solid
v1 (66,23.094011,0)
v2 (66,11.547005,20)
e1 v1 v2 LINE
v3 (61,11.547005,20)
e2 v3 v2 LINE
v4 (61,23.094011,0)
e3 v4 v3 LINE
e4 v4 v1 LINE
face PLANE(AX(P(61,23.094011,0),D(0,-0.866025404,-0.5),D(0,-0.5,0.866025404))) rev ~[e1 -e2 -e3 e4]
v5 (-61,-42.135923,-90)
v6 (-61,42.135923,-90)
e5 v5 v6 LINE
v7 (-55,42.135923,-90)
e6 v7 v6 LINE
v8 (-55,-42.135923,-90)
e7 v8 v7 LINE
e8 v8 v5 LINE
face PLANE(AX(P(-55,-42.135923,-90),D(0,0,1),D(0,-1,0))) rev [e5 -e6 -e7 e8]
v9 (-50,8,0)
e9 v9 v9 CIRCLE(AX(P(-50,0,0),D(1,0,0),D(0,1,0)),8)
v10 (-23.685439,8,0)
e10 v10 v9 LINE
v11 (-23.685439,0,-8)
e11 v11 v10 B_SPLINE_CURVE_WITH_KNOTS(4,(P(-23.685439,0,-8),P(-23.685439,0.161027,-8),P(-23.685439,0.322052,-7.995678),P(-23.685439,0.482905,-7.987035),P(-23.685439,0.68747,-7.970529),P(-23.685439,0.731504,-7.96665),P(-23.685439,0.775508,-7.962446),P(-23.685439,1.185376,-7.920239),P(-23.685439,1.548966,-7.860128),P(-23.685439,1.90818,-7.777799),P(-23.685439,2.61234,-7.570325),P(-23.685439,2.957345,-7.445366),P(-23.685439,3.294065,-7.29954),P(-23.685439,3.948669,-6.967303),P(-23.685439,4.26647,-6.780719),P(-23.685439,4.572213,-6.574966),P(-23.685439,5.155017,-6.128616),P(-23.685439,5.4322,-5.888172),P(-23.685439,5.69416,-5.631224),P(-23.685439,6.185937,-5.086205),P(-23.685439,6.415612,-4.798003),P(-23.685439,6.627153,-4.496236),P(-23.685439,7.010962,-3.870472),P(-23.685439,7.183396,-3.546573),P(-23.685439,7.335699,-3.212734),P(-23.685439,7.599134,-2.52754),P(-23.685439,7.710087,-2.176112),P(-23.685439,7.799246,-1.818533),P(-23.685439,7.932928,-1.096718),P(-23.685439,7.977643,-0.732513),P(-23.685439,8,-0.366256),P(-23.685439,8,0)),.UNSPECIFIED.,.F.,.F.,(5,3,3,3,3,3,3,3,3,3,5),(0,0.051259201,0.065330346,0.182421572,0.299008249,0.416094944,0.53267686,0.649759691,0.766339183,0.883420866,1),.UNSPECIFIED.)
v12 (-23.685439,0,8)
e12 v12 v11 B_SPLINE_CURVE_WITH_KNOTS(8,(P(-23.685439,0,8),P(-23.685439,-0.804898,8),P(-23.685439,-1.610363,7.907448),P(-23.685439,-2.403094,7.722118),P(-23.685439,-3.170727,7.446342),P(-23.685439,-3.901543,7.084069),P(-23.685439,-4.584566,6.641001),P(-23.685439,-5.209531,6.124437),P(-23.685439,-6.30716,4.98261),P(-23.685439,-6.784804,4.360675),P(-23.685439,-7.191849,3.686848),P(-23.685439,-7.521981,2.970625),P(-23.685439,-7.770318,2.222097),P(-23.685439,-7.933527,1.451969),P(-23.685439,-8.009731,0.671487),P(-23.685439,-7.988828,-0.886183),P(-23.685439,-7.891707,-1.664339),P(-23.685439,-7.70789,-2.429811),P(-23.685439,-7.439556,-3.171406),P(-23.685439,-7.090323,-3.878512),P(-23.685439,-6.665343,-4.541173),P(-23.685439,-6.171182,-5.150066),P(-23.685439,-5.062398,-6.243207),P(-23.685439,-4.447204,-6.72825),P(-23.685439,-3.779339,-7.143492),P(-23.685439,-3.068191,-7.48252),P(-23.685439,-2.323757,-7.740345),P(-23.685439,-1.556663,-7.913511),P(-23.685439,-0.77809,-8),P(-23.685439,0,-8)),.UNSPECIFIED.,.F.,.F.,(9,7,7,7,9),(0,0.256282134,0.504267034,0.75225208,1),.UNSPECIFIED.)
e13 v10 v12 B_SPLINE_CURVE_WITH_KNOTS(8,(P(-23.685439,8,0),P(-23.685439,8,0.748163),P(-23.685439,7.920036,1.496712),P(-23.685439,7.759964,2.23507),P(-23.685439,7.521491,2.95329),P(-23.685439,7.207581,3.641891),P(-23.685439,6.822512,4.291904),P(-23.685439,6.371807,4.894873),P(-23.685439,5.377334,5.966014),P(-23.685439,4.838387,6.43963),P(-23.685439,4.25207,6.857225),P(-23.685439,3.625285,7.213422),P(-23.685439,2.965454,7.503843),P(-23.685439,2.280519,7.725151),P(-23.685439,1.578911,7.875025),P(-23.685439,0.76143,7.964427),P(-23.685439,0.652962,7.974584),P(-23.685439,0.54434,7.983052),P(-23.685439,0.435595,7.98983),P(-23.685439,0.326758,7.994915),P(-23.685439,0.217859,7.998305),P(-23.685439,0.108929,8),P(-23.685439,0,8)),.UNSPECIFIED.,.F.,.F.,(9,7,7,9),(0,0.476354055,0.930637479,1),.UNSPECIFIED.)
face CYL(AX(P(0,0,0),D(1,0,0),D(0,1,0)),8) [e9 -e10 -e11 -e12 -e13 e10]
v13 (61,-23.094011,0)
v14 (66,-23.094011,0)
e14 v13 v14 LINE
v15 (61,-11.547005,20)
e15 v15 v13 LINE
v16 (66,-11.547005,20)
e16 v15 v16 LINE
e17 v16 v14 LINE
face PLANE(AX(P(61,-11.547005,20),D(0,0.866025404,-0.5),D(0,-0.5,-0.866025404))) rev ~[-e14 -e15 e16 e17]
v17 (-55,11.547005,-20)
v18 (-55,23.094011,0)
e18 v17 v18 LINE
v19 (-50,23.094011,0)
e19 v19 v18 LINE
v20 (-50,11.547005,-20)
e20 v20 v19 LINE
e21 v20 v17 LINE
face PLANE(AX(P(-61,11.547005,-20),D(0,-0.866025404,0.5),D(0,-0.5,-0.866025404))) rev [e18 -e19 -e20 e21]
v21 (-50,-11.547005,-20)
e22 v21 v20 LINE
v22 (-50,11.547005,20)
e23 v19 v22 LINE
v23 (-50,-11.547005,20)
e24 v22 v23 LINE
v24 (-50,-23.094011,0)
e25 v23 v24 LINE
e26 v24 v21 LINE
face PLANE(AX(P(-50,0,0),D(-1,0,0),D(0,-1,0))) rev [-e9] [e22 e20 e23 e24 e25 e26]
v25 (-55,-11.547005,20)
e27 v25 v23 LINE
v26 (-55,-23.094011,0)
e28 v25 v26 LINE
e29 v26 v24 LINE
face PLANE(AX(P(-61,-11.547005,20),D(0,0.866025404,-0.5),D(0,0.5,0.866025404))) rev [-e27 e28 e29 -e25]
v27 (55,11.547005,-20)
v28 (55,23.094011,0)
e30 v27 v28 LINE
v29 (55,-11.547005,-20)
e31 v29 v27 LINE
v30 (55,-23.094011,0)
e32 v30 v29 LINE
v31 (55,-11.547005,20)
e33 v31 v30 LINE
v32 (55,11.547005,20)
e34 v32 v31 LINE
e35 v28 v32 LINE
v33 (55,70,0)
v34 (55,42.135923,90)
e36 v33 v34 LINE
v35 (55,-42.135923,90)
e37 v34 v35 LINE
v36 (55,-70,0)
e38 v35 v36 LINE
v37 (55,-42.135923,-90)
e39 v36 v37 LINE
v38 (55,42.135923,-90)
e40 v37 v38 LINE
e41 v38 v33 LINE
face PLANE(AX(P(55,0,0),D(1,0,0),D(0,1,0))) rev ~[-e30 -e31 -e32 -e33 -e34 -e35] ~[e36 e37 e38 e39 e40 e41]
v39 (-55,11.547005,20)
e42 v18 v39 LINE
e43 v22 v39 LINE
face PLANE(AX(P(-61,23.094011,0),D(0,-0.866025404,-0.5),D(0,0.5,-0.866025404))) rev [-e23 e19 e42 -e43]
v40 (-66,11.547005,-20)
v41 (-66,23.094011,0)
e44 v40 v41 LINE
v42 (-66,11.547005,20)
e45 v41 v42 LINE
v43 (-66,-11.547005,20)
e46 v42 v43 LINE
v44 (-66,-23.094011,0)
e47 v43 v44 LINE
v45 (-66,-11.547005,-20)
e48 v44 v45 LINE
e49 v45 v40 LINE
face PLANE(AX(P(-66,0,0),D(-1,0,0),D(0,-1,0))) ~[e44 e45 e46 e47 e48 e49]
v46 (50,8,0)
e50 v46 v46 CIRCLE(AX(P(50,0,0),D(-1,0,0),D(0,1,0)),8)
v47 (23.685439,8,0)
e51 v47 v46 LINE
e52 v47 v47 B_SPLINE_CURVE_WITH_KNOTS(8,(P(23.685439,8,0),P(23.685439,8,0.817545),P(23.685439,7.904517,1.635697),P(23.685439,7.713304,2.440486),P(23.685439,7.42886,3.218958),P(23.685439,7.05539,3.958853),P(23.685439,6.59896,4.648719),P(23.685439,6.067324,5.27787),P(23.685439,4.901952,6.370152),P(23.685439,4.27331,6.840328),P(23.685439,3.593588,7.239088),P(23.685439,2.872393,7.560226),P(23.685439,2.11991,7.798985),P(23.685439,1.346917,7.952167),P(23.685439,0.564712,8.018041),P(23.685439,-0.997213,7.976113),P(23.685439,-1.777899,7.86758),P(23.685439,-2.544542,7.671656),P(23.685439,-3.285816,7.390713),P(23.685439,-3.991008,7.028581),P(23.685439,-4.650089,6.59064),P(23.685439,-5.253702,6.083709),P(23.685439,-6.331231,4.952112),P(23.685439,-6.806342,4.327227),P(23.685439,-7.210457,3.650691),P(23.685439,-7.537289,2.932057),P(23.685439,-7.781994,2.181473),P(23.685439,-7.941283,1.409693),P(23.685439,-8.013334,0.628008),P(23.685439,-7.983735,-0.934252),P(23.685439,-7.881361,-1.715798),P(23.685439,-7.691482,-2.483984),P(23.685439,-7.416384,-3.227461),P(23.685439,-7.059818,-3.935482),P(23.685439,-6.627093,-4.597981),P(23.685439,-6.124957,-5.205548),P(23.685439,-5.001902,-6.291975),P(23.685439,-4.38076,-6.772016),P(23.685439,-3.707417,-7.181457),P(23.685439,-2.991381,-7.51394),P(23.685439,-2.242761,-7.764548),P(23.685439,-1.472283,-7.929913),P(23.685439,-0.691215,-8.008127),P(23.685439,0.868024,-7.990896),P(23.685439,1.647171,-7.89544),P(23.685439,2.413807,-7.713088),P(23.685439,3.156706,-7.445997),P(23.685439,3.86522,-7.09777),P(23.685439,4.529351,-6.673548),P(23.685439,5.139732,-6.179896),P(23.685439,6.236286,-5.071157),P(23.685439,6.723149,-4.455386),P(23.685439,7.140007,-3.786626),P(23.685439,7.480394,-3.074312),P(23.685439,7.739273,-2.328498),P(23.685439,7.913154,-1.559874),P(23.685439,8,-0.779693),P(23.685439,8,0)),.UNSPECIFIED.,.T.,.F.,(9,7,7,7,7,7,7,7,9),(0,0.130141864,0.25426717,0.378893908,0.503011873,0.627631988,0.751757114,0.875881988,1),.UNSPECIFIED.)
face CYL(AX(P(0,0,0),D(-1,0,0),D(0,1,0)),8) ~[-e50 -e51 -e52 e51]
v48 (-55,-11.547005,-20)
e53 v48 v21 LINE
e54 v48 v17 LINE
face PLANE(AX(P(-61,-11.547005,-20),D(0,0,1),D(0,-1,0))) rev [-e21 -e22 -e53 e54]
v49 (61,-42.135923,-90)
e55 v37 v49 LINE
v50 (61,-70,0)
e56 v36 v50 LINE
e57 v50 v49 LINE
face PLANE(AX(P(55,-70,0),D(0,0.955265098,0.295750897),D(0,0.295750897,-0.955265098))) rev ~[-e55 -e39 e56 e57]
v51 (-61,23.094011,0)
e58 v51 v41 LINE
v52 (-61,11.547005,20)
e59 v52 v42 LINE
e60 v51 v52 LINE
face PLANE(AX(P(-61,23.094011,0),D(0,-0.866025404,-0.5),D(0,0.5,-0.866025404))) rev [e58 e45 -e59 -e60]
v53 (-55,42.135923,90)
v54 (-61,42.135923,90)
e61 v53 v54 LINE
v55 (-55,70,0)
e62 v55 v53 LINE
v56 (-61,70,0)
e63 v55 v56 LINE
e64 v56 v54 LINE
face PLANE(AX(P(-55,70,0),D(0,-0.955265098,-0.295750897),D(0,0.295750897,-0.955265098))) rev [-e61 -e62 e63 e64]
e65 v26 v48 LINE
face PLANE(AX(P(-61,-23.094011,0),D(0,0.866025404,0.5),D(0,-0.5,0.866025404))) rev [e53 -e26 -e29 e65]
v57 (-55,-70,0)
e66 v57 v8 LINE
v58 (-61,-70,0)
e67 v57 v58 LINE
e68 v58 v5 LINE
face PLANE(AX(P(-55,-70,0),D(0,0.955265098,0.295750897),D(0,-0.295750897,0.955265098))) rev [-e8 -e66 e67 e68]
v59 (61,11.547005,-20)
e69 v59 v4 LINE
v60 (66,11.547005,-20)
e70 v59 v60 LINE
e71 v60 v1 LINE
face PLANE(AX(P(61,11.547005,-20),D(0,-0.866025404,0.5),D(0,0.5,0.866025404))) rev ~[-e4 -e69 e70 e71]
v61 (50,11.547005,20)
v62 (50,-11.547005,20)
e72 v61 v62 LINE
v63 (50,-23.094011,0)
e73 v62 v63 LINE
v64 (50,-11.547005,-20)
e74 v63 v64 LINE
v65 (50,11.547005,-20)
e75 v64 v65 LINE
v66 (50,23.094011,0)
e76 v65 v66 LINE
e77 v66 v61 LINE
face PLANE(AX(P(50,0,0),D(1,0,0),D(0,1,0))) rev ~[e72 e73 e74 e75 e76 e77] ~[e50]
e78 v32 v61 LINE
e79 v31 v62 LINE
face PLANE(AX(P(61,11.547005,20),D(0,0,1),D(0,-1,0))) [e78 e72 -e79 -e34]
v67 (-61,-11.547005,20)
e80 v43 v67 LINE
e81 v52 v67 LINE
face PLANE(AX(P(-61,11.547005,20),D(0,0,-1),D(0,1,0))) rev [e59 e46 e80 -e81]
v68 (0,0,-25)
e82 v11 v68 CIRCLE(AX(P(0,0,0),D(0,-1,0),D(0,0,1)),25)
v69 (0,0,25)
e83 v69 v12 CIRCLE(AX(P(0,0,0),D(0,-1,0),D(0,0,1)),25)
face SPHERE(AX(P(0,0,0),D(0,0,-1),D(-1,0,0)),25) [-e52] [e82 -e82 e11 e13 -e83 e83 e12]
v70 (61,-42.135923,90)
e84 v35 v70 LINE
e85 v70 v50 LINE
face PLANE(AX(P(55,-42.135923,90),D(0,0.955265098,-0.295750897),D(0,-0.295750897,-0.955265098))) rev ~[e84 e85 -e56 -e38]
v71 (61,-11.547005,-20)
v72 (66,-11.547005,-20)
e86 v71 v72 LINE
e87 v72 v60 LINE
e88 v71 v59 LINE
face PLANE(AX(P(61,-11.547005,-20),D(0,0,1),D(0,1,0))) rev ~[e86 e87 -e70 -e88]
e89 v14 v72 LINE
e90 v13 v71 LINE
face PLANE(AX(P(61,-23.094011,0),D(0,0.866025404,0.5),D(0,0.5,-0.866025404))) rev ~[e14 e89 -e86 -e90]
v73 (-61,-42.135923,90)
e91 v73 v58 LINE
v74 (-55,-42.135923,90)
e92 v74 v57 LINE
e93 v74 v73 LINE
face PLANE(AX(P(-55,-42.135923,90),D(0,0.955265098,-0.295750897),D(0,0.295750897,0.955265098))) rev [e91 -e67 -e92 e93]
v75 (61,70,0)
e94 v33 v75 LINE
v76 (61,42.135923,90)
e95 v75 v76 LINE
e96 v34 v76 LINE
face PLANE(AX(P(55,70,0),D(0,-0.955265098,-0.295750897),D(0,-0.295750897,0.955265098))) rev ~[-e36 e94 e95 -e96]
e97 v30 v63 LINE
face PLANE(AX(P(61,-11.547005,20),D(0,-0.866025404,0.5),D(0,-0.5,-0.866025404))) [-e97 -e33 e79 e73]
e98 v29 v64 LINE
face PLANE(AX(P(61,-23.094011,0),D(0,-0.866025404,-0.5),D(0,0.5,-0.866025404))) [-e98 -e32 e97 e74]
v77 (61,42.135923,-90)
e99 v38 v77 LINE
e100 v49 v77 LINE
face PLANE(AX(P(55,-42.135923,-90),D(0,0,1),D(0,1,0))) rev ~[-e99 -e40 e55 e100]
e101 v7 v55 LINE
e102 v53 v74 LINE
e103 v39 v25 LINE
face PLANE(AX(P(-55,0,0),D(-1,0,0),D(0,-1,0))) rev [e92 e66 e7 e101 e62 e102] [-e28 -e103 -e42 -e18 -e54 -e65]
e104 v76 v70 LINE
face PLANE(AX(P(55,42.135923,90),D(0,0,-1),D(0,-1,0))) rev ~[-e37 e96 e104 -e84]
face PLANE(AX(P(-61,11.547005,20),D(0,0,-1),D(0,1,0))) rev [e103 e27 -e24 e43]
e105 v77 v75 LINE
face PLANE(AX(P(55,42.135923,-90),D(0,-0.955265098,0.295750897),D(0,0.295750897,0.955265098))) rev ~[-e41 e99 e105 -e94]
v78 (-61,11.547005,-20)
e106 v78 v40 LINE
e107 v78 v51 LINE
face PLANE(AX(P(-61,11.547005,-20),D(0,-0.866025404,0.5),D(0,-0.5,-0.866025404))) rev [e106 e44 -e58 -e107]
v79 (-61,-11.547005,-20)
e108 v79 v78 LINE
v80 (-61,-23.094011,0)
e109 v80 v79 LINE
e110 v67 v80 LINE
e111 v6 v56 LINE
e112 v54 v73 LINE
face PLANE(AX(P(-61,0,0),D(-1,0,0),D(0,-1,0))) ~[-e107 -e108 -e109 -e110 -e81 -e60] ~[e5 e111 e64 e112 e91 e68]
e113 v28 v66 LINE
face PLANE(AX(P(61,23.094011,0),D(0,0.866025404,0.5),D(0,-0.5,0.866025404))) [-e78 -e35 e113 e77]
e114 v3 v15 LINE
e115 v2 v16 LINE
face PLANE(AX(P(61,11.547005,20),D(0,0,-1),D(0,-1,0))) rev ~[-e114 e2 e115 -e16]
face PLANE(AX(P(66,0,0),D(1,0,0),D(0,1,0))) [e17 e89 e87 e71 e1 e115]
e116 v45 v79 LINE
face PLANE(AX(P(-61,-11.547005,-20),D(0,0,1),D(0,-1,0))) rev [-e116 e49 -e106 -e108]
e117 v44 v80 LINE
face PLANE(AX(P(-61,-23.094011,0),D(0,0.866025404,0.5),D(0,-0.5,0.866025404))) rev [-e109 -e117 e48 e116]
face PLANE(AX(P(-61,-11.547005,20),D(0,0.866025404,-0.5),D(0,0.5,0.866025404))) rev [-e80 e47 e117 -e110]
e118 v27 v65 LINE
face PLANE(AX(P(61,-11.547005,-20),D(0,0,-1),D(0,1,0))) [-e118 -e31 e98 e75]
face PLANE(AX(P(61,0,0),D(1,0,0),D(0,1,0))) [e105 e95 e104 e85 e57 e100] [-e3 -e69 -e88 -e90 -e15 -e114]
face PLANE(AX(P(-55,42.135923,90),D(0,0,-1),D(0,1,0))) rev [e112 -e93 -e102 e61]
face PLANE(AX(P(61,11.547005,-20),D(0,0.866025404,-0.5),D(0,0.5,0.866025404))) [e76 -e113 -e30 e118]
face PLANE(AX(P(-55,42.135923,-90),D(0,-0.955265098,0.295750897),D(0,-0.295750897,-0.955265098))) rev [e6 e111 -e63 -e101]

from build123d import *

# Parameters (mm, degrees)
F2_R          = 8
F3_DEPTH      = 55
F5_DEPTH      = 6
F7_DEPTH      = 5
F7_DEPTH_BACK = 11


# Not quite as in the source:
# - a pattern or mirror of a feature is missing from the dataset's text; its kind, count and spacing are read off the source's solid


with BuildPart() as f1:
    # F0 (on Front) → F1 (revolve)
    with BuildSketch(Plane.XZ):
        with BuildLine():
            Line((0, -25), (0, 25))
            ThreePointArc((0, 25), (-25, 0), (0, -25))
        make_face()
    revolve(axis=Axis((0, 0, 0), (0, 0, -1)))

    # F2 (on Right) → F3 (join)
    with BuildSketch(Plane.YZ):
        Circle(F2_R)
    f3 = extrude(amount=F3_DEPTH)

    # F3_copies: F3 across plane
    add(f3.mirror(Plane(origin=(0, 0, 0), x_dir=(0, 0, -1), z_dir=(-1, 0, 0))))

    # F4 (on face) → F5 (join)
    with BuildSketch(Plane.YZ.offset(55)):
        Polygon((-42.1359225246, 90), (-70, 0), (-42.1359225246, -90), (42.1359225246, -90), (70, 0), (42.1359225246, 90), align=None)
    f5 = extrude(amount=F5_DEPTH)

    # F5_copies: F5 across plane
    add(f5.mirror(Plane(origin=(0, 0, 0), x_dir=(0, 0, -1), z_dir=(-1, 0, 0))))

    # F6 (on face) → F7 (join, two sides)
    with BuildSketch(Plane.YZ.offset(61)) as f7_sk:
        Polygon((-11.5470053838, -20), (11.5470053838, -20), (23.0940107676, 0), (11.5470053838, 20), (-11.5470053838, 20), (-23.0940107676, 0), align=None)
    f7 = extrude(amount=F7_DEPTH) + extrude(f7_sk.sketch, amount=-F7_DEPTH_BACK)

    # F7_copies: F7 across plane
    add(f7.mirror(Plane(origin=(0, 0, 0), x_dir=(0, 0, -1), z_dir=(-1, 0, 0))))


solid = f1.part
